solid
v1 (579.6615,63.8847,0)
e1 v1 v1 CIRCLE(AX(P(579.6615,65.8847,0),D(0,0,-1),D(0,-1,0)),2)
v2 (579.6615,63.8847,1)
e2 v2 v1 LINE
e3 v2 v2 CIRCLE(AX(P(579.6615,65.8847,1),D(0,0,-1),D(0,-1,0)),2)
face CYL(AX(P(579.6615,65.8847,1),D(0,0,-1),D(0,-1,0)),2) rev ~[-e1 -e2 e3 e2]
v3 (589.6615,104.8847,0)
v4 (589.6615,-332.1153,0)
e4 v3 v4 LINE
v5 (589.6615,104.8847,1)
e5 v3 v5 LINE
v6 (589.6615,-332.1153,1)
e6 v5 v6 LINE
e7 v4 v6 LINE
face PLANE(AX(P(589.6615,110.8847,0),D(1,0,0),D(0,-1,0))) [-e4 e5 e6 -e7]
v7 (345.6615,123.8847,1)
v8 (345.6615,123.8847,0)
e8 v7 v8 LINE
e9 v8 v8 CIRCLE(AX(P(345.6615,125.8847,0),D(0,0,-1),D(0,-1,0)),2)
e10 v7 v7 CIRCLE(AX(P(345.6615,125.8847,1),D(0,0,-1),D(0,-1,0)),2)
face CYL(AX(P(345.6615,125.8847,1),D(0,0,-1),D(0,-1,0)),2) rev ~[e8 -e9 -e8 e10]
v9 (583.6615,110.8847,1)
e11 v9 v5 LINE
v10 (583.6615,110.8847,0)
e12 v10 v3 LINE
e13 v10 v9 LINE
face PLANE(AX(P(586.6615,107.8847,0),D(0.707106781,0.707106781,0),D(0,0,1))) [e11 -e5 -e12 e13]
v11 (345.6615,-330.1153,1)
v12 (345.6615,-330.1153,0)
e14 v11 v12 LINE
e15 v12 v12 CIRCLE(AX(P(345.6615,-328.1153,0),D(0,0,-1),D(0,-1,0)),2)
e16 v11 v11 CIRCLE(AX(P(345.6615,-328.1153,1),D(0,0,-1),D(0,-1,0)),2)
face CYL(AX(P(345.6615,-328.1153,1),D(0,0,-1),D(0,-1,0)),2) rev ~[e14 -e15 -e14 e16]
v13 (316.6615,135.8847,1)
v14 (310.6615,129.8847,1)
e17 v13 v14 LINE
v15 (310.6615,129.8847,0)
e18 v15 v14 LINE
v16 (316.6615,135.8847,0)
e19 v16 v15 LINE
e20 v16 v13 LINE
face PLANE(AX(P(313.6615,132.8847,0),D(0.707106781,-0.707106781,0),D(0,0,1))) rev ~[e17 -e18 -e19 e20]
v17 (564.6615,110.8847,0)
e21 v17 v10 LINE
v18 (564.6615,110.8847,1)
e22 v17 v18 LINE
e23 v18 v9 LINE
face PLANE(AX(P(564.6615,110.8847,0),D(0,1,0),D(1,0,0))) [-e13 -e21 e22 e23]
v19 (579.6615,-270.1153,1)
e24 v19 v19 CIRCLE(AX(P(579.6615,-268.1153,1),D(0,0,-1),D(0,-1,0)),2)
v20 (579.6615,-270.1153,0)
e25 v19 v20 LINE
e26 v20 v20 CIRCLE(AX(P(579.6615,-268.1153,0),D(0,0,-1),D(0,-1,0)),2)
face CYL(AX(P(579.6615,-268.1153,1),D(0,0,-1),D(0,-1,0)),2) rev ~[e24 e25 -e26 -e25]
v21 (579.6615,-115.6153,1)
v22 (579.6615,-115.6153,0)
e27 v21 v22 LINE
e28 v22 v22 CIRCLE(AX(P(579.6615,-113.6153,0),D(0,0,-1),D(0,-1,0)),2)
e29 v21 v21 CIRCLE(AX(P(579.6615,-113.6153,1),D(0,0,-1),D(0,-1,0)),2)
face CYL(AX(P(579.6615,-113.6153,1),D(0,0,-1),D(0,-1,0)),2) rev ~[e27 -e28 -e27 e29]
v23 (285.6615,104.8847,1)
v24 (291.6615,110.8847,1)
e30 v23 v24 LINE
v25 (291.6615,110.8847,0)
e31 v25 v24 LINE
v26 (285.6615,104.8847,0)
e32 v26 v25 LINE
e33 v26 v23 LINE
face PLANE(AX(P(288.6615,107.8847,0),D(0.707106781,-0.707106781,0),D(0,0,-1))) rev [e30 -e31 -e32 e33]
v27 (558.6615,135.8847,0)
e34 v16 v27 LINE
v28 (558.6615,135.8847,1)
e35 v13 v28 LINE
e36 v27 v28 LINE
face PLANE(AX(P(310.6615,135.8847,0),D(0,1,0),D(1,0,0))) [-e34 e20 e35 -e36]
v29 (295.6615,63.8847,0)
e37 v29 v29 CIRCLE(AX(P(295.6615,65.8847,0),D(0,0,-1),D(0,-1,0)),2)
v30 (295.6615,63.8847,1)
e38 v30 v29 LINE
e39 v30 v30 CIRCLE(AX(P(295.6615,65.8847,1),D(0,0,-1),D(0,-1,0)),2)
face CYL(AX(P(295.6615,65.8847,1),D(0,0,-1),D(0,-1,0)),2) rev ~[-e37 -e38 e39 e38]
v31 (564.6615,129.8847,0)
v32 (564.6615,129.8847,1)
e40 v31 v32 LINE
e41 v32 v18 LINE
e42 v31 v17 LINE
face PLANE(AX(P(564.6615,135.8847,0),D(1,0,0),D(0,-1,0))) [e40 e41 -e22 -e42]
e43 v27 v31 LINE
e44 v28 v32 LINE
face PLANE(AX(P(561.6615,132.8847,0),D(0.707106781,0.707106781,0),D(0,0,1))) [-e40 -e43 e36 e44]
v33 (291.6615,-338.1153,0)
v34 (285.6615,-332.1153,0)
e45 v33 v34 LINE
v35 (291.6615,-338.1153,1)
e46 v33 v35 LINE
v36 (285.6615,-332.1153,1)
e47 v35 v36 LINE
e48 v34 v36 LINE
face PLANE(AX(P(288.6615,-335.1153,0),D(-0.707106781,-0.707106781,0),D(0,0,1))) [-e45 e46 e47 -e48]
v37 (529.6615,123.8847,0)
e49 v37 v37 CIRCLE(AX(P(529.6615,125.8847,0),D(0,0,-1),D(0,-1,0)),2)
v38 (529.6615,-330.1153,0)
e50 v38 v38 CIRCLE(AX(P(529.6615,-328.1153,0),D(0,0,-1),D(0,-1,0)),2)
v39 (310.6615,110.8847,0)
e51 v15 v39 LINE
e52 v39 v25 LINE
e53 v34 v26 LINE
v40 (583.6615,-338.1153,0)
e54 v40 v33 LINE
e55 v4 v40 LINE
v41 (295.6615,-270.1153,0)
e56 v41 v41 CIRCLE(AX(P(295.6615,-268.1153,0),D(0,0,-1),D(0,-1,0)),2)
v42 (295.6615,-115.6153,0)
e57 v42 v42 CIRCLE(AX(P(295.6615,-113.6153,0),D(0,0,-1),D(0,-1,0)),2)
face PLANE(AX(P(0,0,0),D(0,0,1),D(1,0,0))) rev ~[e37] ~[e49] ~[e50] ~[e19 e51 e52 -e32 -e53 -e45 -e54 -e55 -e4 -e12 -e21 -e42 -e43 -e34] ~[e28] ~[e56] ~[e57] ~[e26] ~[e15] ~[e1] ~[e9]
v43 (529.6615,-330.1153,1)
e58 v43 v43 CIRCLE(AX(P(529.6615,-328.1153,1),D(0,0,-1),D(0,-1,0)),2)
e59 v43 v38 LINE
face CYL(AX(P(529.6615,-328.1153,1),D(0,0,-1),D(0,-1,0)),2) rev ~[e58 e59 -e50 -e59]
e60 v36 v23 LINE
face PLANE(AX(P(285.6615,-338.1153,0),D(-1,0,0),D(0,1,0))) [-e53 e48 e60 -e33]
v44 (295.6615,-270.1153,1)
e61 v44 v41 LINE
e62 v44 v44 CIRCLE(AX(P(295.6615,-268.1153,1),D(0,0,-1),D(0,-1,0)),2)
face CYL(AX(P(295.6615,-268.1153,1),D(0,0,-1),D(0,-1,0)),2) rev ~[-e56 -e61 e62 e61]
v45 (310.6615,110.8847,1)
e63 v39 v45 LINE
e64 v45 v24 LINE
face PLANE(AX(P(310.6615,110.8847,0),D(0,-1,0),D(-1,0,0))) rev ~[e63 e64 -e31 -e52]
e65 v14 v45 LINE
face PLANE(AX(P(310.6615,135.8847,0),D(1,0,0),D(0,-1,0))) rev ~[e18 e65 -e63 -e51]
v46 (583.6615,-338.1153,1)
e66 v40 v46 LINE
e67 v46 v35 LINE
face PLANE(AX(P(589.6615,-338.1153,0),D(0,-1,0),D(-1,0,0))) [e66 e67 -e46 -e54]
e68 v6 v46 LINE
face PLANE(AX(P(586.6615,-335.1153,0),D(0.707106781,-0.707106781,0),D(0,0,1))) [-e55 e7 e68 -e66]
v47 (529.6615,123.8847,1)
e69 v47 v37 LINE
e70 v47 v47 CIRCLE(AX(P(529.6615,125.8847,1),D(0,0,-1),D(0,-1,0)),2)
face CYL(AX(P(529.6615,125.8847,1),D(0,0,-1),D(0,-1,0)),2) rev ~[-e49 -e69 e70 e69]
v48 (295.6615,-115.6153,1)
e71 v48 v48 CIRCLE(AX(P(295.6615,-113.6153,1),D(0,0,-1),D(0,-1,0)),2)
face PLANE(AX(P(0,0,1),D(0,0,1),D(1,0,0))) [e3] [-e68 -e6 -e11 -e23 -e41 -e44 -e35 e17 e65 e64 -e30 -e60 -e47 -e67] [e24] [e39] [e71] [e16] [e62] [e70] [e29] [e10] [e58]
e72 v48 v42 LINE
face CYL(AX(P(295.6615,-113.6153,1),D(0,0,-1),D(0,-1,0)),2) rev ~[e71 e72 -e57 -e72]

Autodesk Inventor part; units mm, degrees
ref_plane "YZ Plane" through (0, 0, 0) normal (1, 0, 0) x (0, 1, 0)
ref_plane "XZ Plane" through (0, 0, 0) normal (0, 1, 0) x (-1, 0, 0)
sketch "Sketch1" plane through (0, 0, 0) normal (0, 0, 1) x (1, 0, 0)
  line L0 (285.6615, 135.8847) -> (589.6615, 135.8847)
  line L1 (589.6615, 135.8847) -> (589.6615, -338.1153)
  line L2 (589.6615, -338.1153) -> (285.6615, -338.1153)
  line L3 (285.6615, -338.1153) -> (285.6615, 135.8847)
  line L4 (285.6615, 135.8847) -> (310.6615, 135.8847)
  line L5 (310.6615, 135.8847) -> (310.6615, 110.8847)
  line L6 (310.6615, 110.8847) -> (285.6615, 110.8847)
  line L7 (285.6615, 110.8847) -> (285.6615, 135.8847)
  line L8 (589.6615, 135.8847) -> (564.6615, 135.8847)
  line L9 (564.6615, 135.8847) -> (564.6615, 110.8847)
  line L10 (564.6615, 110.8847) -> (589.6615, 110.8847)
  line L11 (589.6615, 110.8847) -> (589.6615, 135.8847)
  line L12 (592.6615, 138.6726) -> (592.6615, -341.1153)
  line L13 (596.6615, -341.1153) -> (278.6615, -341.1153)
  line L14 (282.6615, -341.1153) -> (282.6615, 138.6726)
  line L15 (282.8736, 138.8847) -> (592.4493, 138.8847)
  dimension "d44" = 25
  dimension "d45" = 25
  dimension "d46" = 25
  dimension "d47" = 25
  dimension "d80" = 3
  dimension "d81" = 3
  dimension "d82" = 3
  dimension "d83" = 3
ref_plane "Work Plane1" through (0, 0, 1) normal (0, 0, 1) x (1, 0, 0)
sketch "Sketch2" plane through (0, 0, 1) normal (0, 0, 1) x (1, 0, 0)
  line L0 (-371, 477) -> (-30.2121, 477) projected
  line L1 (-377, 455) -> (-377, 471) projected
  line L2 (-24.2121, 471) -> (-24.2121, 455) projected
  line L3 (-30.2121, 3) -> (-371, 3) projected
  line L4 (-402, 34) -> (-402, 446) projected
  line L5 (-396, 452) -> (-380, 452) projected
  line L6 (-380, 28) -> (-396, 28) projected
  line L7 (0.7879, 446) -> (0.7879, 34) projected
  point P0 (0, 0)
  point P1 (-317, 467)
  point P2 (-84.2121, 467)
  point P3 (-392, 392)
  point P4 (-392, 88)
  point P5 (-392, 240)
  point P6 (-9.2121, 392)
  point P7 (-9.2121, 240)
  point P8 (-9.2121, 88)
  point P9 (-317, 13)
  point P10 (-84.2121, 13)
  point P11 (-402, 240)
  dimension "d27" = 10
  dimension "d28" = 60
  dimension "d29" = 60
  dimension "d30" = 10
  dimension "d31" = 10
  dimension "d32" = 60
  dimension "d33" = 60
  dimension "d34" = 10
extrude "Plate2" add sketch "Sketch1" along normal blind 1 contours L0 L9 L10 L1 L2 L3 L6 L5
hole "Hole2" at (-317, 467, 1) at (-84.2121, 467, 1) at (-392, 392, 1) at (-392, 88, 1) at (-392, 240, 1) at (-9.2121, 392, 1) at (-9.2121, 240, 1) at (-9.2121, 88, 1) at (-317, 13, 1) at (-84.2121, 13, 1) direction (0, 0, -1) diameter 4 depth 1 tip angle 118
chamfer "Corner Chamfer1" distance 6 angle 45 6 edges at (285.6615, 110.8847, 0.5) (310.6615, 135.8847, 0.5) (564.6615, 135.8847, 0.5) (589.6615, 110.8847, 0.5) (589.6615, -338.1153, 0.5) (285.6615, -338.1153, 0.5)
sketch "Sketch3" plane through (0, 0, 1) normal (0, 0, 1) x (1, 0, 0)
  line L0 (291.6615, -338.1153) -> (583.6615, -338.1153) projected
  line L1 (589.6615, 104.8847) -> (589.6615, -332.1153) projected
  line L2 (285.6615, -332.1153) -> (285.6615, 104.8847) projected
  line L3 (316.6615, 135.8847) -> (558.6615, 135.8847) projected
  point P0 (0, 0)
  point P1 (529.6615, -328.1153)
  point P2 (345.6615, -328.1153)
  point P3 (579.6615, -268.1153)
  point P4 (579.6615, -113.6153)
  point P5 (579.6615, 65.8847)
  point P6 (529.6615, 125.8847)
  point P7 (345.6615, 125.8847)
  point P8 (295.6615, 65.8847)
  point P9 (295.6615, -113.6153)
  point P10 (295.6615, -268.1153)
  point P11 (589.6615, -113.6153)
  dimension "d63" = 10
  dimension "d64" = 60
  dimension "d65" = 60
  dimension "d66" = 10
  dimension "d67" = 70
  dimension "d68" = 70
  dimension "d69" = 10
  dimension "d70" = 10
hole "Hole3" at (529.6615, -328.1153, 1) at (345.6615, -328.1153, 1) at (579.6615, -268.1153, 1) at (579.6615, -113.6153, 1) at (579.6615, 65.8847, 1) at (529.6615, 125.8847, 1) at (345.6615, 125.8847, 1) at (295.6615, 65.8847, 1) at (295.6615, -113.6153, 1) at (295.6615, -268.1153, 1) direction (0, 0, -1) diameter 4 depth 1 tip angle 118
equation "\"d30\" = d27"
equation "\"d54\" = Thickness"
equation "\"d76\" = Thickness"
equation "\"BendRadius\" = Thickness"
equation "\"BendReliefWidth\" = Thickness"
equation "\"BendReliefDepth\" = 0.5 * Thickness"
equation "\"CornerReliefSize\" = 4 * Thickness"
equation "\"MinimumRemnant\" = 2 * Thickness"
equation "\"TransitionRadius\" = BendRadius"
equation "\"JacobiRadiusSize\" = BendRadius"
equation "\"GapSize\" = Thickness"
equation "\"d26\" = BendRadius"
equation "\"d48\" = BendRadius"
equation "\"Thickness\" = 1"
properties part number "Sheetbottom"
